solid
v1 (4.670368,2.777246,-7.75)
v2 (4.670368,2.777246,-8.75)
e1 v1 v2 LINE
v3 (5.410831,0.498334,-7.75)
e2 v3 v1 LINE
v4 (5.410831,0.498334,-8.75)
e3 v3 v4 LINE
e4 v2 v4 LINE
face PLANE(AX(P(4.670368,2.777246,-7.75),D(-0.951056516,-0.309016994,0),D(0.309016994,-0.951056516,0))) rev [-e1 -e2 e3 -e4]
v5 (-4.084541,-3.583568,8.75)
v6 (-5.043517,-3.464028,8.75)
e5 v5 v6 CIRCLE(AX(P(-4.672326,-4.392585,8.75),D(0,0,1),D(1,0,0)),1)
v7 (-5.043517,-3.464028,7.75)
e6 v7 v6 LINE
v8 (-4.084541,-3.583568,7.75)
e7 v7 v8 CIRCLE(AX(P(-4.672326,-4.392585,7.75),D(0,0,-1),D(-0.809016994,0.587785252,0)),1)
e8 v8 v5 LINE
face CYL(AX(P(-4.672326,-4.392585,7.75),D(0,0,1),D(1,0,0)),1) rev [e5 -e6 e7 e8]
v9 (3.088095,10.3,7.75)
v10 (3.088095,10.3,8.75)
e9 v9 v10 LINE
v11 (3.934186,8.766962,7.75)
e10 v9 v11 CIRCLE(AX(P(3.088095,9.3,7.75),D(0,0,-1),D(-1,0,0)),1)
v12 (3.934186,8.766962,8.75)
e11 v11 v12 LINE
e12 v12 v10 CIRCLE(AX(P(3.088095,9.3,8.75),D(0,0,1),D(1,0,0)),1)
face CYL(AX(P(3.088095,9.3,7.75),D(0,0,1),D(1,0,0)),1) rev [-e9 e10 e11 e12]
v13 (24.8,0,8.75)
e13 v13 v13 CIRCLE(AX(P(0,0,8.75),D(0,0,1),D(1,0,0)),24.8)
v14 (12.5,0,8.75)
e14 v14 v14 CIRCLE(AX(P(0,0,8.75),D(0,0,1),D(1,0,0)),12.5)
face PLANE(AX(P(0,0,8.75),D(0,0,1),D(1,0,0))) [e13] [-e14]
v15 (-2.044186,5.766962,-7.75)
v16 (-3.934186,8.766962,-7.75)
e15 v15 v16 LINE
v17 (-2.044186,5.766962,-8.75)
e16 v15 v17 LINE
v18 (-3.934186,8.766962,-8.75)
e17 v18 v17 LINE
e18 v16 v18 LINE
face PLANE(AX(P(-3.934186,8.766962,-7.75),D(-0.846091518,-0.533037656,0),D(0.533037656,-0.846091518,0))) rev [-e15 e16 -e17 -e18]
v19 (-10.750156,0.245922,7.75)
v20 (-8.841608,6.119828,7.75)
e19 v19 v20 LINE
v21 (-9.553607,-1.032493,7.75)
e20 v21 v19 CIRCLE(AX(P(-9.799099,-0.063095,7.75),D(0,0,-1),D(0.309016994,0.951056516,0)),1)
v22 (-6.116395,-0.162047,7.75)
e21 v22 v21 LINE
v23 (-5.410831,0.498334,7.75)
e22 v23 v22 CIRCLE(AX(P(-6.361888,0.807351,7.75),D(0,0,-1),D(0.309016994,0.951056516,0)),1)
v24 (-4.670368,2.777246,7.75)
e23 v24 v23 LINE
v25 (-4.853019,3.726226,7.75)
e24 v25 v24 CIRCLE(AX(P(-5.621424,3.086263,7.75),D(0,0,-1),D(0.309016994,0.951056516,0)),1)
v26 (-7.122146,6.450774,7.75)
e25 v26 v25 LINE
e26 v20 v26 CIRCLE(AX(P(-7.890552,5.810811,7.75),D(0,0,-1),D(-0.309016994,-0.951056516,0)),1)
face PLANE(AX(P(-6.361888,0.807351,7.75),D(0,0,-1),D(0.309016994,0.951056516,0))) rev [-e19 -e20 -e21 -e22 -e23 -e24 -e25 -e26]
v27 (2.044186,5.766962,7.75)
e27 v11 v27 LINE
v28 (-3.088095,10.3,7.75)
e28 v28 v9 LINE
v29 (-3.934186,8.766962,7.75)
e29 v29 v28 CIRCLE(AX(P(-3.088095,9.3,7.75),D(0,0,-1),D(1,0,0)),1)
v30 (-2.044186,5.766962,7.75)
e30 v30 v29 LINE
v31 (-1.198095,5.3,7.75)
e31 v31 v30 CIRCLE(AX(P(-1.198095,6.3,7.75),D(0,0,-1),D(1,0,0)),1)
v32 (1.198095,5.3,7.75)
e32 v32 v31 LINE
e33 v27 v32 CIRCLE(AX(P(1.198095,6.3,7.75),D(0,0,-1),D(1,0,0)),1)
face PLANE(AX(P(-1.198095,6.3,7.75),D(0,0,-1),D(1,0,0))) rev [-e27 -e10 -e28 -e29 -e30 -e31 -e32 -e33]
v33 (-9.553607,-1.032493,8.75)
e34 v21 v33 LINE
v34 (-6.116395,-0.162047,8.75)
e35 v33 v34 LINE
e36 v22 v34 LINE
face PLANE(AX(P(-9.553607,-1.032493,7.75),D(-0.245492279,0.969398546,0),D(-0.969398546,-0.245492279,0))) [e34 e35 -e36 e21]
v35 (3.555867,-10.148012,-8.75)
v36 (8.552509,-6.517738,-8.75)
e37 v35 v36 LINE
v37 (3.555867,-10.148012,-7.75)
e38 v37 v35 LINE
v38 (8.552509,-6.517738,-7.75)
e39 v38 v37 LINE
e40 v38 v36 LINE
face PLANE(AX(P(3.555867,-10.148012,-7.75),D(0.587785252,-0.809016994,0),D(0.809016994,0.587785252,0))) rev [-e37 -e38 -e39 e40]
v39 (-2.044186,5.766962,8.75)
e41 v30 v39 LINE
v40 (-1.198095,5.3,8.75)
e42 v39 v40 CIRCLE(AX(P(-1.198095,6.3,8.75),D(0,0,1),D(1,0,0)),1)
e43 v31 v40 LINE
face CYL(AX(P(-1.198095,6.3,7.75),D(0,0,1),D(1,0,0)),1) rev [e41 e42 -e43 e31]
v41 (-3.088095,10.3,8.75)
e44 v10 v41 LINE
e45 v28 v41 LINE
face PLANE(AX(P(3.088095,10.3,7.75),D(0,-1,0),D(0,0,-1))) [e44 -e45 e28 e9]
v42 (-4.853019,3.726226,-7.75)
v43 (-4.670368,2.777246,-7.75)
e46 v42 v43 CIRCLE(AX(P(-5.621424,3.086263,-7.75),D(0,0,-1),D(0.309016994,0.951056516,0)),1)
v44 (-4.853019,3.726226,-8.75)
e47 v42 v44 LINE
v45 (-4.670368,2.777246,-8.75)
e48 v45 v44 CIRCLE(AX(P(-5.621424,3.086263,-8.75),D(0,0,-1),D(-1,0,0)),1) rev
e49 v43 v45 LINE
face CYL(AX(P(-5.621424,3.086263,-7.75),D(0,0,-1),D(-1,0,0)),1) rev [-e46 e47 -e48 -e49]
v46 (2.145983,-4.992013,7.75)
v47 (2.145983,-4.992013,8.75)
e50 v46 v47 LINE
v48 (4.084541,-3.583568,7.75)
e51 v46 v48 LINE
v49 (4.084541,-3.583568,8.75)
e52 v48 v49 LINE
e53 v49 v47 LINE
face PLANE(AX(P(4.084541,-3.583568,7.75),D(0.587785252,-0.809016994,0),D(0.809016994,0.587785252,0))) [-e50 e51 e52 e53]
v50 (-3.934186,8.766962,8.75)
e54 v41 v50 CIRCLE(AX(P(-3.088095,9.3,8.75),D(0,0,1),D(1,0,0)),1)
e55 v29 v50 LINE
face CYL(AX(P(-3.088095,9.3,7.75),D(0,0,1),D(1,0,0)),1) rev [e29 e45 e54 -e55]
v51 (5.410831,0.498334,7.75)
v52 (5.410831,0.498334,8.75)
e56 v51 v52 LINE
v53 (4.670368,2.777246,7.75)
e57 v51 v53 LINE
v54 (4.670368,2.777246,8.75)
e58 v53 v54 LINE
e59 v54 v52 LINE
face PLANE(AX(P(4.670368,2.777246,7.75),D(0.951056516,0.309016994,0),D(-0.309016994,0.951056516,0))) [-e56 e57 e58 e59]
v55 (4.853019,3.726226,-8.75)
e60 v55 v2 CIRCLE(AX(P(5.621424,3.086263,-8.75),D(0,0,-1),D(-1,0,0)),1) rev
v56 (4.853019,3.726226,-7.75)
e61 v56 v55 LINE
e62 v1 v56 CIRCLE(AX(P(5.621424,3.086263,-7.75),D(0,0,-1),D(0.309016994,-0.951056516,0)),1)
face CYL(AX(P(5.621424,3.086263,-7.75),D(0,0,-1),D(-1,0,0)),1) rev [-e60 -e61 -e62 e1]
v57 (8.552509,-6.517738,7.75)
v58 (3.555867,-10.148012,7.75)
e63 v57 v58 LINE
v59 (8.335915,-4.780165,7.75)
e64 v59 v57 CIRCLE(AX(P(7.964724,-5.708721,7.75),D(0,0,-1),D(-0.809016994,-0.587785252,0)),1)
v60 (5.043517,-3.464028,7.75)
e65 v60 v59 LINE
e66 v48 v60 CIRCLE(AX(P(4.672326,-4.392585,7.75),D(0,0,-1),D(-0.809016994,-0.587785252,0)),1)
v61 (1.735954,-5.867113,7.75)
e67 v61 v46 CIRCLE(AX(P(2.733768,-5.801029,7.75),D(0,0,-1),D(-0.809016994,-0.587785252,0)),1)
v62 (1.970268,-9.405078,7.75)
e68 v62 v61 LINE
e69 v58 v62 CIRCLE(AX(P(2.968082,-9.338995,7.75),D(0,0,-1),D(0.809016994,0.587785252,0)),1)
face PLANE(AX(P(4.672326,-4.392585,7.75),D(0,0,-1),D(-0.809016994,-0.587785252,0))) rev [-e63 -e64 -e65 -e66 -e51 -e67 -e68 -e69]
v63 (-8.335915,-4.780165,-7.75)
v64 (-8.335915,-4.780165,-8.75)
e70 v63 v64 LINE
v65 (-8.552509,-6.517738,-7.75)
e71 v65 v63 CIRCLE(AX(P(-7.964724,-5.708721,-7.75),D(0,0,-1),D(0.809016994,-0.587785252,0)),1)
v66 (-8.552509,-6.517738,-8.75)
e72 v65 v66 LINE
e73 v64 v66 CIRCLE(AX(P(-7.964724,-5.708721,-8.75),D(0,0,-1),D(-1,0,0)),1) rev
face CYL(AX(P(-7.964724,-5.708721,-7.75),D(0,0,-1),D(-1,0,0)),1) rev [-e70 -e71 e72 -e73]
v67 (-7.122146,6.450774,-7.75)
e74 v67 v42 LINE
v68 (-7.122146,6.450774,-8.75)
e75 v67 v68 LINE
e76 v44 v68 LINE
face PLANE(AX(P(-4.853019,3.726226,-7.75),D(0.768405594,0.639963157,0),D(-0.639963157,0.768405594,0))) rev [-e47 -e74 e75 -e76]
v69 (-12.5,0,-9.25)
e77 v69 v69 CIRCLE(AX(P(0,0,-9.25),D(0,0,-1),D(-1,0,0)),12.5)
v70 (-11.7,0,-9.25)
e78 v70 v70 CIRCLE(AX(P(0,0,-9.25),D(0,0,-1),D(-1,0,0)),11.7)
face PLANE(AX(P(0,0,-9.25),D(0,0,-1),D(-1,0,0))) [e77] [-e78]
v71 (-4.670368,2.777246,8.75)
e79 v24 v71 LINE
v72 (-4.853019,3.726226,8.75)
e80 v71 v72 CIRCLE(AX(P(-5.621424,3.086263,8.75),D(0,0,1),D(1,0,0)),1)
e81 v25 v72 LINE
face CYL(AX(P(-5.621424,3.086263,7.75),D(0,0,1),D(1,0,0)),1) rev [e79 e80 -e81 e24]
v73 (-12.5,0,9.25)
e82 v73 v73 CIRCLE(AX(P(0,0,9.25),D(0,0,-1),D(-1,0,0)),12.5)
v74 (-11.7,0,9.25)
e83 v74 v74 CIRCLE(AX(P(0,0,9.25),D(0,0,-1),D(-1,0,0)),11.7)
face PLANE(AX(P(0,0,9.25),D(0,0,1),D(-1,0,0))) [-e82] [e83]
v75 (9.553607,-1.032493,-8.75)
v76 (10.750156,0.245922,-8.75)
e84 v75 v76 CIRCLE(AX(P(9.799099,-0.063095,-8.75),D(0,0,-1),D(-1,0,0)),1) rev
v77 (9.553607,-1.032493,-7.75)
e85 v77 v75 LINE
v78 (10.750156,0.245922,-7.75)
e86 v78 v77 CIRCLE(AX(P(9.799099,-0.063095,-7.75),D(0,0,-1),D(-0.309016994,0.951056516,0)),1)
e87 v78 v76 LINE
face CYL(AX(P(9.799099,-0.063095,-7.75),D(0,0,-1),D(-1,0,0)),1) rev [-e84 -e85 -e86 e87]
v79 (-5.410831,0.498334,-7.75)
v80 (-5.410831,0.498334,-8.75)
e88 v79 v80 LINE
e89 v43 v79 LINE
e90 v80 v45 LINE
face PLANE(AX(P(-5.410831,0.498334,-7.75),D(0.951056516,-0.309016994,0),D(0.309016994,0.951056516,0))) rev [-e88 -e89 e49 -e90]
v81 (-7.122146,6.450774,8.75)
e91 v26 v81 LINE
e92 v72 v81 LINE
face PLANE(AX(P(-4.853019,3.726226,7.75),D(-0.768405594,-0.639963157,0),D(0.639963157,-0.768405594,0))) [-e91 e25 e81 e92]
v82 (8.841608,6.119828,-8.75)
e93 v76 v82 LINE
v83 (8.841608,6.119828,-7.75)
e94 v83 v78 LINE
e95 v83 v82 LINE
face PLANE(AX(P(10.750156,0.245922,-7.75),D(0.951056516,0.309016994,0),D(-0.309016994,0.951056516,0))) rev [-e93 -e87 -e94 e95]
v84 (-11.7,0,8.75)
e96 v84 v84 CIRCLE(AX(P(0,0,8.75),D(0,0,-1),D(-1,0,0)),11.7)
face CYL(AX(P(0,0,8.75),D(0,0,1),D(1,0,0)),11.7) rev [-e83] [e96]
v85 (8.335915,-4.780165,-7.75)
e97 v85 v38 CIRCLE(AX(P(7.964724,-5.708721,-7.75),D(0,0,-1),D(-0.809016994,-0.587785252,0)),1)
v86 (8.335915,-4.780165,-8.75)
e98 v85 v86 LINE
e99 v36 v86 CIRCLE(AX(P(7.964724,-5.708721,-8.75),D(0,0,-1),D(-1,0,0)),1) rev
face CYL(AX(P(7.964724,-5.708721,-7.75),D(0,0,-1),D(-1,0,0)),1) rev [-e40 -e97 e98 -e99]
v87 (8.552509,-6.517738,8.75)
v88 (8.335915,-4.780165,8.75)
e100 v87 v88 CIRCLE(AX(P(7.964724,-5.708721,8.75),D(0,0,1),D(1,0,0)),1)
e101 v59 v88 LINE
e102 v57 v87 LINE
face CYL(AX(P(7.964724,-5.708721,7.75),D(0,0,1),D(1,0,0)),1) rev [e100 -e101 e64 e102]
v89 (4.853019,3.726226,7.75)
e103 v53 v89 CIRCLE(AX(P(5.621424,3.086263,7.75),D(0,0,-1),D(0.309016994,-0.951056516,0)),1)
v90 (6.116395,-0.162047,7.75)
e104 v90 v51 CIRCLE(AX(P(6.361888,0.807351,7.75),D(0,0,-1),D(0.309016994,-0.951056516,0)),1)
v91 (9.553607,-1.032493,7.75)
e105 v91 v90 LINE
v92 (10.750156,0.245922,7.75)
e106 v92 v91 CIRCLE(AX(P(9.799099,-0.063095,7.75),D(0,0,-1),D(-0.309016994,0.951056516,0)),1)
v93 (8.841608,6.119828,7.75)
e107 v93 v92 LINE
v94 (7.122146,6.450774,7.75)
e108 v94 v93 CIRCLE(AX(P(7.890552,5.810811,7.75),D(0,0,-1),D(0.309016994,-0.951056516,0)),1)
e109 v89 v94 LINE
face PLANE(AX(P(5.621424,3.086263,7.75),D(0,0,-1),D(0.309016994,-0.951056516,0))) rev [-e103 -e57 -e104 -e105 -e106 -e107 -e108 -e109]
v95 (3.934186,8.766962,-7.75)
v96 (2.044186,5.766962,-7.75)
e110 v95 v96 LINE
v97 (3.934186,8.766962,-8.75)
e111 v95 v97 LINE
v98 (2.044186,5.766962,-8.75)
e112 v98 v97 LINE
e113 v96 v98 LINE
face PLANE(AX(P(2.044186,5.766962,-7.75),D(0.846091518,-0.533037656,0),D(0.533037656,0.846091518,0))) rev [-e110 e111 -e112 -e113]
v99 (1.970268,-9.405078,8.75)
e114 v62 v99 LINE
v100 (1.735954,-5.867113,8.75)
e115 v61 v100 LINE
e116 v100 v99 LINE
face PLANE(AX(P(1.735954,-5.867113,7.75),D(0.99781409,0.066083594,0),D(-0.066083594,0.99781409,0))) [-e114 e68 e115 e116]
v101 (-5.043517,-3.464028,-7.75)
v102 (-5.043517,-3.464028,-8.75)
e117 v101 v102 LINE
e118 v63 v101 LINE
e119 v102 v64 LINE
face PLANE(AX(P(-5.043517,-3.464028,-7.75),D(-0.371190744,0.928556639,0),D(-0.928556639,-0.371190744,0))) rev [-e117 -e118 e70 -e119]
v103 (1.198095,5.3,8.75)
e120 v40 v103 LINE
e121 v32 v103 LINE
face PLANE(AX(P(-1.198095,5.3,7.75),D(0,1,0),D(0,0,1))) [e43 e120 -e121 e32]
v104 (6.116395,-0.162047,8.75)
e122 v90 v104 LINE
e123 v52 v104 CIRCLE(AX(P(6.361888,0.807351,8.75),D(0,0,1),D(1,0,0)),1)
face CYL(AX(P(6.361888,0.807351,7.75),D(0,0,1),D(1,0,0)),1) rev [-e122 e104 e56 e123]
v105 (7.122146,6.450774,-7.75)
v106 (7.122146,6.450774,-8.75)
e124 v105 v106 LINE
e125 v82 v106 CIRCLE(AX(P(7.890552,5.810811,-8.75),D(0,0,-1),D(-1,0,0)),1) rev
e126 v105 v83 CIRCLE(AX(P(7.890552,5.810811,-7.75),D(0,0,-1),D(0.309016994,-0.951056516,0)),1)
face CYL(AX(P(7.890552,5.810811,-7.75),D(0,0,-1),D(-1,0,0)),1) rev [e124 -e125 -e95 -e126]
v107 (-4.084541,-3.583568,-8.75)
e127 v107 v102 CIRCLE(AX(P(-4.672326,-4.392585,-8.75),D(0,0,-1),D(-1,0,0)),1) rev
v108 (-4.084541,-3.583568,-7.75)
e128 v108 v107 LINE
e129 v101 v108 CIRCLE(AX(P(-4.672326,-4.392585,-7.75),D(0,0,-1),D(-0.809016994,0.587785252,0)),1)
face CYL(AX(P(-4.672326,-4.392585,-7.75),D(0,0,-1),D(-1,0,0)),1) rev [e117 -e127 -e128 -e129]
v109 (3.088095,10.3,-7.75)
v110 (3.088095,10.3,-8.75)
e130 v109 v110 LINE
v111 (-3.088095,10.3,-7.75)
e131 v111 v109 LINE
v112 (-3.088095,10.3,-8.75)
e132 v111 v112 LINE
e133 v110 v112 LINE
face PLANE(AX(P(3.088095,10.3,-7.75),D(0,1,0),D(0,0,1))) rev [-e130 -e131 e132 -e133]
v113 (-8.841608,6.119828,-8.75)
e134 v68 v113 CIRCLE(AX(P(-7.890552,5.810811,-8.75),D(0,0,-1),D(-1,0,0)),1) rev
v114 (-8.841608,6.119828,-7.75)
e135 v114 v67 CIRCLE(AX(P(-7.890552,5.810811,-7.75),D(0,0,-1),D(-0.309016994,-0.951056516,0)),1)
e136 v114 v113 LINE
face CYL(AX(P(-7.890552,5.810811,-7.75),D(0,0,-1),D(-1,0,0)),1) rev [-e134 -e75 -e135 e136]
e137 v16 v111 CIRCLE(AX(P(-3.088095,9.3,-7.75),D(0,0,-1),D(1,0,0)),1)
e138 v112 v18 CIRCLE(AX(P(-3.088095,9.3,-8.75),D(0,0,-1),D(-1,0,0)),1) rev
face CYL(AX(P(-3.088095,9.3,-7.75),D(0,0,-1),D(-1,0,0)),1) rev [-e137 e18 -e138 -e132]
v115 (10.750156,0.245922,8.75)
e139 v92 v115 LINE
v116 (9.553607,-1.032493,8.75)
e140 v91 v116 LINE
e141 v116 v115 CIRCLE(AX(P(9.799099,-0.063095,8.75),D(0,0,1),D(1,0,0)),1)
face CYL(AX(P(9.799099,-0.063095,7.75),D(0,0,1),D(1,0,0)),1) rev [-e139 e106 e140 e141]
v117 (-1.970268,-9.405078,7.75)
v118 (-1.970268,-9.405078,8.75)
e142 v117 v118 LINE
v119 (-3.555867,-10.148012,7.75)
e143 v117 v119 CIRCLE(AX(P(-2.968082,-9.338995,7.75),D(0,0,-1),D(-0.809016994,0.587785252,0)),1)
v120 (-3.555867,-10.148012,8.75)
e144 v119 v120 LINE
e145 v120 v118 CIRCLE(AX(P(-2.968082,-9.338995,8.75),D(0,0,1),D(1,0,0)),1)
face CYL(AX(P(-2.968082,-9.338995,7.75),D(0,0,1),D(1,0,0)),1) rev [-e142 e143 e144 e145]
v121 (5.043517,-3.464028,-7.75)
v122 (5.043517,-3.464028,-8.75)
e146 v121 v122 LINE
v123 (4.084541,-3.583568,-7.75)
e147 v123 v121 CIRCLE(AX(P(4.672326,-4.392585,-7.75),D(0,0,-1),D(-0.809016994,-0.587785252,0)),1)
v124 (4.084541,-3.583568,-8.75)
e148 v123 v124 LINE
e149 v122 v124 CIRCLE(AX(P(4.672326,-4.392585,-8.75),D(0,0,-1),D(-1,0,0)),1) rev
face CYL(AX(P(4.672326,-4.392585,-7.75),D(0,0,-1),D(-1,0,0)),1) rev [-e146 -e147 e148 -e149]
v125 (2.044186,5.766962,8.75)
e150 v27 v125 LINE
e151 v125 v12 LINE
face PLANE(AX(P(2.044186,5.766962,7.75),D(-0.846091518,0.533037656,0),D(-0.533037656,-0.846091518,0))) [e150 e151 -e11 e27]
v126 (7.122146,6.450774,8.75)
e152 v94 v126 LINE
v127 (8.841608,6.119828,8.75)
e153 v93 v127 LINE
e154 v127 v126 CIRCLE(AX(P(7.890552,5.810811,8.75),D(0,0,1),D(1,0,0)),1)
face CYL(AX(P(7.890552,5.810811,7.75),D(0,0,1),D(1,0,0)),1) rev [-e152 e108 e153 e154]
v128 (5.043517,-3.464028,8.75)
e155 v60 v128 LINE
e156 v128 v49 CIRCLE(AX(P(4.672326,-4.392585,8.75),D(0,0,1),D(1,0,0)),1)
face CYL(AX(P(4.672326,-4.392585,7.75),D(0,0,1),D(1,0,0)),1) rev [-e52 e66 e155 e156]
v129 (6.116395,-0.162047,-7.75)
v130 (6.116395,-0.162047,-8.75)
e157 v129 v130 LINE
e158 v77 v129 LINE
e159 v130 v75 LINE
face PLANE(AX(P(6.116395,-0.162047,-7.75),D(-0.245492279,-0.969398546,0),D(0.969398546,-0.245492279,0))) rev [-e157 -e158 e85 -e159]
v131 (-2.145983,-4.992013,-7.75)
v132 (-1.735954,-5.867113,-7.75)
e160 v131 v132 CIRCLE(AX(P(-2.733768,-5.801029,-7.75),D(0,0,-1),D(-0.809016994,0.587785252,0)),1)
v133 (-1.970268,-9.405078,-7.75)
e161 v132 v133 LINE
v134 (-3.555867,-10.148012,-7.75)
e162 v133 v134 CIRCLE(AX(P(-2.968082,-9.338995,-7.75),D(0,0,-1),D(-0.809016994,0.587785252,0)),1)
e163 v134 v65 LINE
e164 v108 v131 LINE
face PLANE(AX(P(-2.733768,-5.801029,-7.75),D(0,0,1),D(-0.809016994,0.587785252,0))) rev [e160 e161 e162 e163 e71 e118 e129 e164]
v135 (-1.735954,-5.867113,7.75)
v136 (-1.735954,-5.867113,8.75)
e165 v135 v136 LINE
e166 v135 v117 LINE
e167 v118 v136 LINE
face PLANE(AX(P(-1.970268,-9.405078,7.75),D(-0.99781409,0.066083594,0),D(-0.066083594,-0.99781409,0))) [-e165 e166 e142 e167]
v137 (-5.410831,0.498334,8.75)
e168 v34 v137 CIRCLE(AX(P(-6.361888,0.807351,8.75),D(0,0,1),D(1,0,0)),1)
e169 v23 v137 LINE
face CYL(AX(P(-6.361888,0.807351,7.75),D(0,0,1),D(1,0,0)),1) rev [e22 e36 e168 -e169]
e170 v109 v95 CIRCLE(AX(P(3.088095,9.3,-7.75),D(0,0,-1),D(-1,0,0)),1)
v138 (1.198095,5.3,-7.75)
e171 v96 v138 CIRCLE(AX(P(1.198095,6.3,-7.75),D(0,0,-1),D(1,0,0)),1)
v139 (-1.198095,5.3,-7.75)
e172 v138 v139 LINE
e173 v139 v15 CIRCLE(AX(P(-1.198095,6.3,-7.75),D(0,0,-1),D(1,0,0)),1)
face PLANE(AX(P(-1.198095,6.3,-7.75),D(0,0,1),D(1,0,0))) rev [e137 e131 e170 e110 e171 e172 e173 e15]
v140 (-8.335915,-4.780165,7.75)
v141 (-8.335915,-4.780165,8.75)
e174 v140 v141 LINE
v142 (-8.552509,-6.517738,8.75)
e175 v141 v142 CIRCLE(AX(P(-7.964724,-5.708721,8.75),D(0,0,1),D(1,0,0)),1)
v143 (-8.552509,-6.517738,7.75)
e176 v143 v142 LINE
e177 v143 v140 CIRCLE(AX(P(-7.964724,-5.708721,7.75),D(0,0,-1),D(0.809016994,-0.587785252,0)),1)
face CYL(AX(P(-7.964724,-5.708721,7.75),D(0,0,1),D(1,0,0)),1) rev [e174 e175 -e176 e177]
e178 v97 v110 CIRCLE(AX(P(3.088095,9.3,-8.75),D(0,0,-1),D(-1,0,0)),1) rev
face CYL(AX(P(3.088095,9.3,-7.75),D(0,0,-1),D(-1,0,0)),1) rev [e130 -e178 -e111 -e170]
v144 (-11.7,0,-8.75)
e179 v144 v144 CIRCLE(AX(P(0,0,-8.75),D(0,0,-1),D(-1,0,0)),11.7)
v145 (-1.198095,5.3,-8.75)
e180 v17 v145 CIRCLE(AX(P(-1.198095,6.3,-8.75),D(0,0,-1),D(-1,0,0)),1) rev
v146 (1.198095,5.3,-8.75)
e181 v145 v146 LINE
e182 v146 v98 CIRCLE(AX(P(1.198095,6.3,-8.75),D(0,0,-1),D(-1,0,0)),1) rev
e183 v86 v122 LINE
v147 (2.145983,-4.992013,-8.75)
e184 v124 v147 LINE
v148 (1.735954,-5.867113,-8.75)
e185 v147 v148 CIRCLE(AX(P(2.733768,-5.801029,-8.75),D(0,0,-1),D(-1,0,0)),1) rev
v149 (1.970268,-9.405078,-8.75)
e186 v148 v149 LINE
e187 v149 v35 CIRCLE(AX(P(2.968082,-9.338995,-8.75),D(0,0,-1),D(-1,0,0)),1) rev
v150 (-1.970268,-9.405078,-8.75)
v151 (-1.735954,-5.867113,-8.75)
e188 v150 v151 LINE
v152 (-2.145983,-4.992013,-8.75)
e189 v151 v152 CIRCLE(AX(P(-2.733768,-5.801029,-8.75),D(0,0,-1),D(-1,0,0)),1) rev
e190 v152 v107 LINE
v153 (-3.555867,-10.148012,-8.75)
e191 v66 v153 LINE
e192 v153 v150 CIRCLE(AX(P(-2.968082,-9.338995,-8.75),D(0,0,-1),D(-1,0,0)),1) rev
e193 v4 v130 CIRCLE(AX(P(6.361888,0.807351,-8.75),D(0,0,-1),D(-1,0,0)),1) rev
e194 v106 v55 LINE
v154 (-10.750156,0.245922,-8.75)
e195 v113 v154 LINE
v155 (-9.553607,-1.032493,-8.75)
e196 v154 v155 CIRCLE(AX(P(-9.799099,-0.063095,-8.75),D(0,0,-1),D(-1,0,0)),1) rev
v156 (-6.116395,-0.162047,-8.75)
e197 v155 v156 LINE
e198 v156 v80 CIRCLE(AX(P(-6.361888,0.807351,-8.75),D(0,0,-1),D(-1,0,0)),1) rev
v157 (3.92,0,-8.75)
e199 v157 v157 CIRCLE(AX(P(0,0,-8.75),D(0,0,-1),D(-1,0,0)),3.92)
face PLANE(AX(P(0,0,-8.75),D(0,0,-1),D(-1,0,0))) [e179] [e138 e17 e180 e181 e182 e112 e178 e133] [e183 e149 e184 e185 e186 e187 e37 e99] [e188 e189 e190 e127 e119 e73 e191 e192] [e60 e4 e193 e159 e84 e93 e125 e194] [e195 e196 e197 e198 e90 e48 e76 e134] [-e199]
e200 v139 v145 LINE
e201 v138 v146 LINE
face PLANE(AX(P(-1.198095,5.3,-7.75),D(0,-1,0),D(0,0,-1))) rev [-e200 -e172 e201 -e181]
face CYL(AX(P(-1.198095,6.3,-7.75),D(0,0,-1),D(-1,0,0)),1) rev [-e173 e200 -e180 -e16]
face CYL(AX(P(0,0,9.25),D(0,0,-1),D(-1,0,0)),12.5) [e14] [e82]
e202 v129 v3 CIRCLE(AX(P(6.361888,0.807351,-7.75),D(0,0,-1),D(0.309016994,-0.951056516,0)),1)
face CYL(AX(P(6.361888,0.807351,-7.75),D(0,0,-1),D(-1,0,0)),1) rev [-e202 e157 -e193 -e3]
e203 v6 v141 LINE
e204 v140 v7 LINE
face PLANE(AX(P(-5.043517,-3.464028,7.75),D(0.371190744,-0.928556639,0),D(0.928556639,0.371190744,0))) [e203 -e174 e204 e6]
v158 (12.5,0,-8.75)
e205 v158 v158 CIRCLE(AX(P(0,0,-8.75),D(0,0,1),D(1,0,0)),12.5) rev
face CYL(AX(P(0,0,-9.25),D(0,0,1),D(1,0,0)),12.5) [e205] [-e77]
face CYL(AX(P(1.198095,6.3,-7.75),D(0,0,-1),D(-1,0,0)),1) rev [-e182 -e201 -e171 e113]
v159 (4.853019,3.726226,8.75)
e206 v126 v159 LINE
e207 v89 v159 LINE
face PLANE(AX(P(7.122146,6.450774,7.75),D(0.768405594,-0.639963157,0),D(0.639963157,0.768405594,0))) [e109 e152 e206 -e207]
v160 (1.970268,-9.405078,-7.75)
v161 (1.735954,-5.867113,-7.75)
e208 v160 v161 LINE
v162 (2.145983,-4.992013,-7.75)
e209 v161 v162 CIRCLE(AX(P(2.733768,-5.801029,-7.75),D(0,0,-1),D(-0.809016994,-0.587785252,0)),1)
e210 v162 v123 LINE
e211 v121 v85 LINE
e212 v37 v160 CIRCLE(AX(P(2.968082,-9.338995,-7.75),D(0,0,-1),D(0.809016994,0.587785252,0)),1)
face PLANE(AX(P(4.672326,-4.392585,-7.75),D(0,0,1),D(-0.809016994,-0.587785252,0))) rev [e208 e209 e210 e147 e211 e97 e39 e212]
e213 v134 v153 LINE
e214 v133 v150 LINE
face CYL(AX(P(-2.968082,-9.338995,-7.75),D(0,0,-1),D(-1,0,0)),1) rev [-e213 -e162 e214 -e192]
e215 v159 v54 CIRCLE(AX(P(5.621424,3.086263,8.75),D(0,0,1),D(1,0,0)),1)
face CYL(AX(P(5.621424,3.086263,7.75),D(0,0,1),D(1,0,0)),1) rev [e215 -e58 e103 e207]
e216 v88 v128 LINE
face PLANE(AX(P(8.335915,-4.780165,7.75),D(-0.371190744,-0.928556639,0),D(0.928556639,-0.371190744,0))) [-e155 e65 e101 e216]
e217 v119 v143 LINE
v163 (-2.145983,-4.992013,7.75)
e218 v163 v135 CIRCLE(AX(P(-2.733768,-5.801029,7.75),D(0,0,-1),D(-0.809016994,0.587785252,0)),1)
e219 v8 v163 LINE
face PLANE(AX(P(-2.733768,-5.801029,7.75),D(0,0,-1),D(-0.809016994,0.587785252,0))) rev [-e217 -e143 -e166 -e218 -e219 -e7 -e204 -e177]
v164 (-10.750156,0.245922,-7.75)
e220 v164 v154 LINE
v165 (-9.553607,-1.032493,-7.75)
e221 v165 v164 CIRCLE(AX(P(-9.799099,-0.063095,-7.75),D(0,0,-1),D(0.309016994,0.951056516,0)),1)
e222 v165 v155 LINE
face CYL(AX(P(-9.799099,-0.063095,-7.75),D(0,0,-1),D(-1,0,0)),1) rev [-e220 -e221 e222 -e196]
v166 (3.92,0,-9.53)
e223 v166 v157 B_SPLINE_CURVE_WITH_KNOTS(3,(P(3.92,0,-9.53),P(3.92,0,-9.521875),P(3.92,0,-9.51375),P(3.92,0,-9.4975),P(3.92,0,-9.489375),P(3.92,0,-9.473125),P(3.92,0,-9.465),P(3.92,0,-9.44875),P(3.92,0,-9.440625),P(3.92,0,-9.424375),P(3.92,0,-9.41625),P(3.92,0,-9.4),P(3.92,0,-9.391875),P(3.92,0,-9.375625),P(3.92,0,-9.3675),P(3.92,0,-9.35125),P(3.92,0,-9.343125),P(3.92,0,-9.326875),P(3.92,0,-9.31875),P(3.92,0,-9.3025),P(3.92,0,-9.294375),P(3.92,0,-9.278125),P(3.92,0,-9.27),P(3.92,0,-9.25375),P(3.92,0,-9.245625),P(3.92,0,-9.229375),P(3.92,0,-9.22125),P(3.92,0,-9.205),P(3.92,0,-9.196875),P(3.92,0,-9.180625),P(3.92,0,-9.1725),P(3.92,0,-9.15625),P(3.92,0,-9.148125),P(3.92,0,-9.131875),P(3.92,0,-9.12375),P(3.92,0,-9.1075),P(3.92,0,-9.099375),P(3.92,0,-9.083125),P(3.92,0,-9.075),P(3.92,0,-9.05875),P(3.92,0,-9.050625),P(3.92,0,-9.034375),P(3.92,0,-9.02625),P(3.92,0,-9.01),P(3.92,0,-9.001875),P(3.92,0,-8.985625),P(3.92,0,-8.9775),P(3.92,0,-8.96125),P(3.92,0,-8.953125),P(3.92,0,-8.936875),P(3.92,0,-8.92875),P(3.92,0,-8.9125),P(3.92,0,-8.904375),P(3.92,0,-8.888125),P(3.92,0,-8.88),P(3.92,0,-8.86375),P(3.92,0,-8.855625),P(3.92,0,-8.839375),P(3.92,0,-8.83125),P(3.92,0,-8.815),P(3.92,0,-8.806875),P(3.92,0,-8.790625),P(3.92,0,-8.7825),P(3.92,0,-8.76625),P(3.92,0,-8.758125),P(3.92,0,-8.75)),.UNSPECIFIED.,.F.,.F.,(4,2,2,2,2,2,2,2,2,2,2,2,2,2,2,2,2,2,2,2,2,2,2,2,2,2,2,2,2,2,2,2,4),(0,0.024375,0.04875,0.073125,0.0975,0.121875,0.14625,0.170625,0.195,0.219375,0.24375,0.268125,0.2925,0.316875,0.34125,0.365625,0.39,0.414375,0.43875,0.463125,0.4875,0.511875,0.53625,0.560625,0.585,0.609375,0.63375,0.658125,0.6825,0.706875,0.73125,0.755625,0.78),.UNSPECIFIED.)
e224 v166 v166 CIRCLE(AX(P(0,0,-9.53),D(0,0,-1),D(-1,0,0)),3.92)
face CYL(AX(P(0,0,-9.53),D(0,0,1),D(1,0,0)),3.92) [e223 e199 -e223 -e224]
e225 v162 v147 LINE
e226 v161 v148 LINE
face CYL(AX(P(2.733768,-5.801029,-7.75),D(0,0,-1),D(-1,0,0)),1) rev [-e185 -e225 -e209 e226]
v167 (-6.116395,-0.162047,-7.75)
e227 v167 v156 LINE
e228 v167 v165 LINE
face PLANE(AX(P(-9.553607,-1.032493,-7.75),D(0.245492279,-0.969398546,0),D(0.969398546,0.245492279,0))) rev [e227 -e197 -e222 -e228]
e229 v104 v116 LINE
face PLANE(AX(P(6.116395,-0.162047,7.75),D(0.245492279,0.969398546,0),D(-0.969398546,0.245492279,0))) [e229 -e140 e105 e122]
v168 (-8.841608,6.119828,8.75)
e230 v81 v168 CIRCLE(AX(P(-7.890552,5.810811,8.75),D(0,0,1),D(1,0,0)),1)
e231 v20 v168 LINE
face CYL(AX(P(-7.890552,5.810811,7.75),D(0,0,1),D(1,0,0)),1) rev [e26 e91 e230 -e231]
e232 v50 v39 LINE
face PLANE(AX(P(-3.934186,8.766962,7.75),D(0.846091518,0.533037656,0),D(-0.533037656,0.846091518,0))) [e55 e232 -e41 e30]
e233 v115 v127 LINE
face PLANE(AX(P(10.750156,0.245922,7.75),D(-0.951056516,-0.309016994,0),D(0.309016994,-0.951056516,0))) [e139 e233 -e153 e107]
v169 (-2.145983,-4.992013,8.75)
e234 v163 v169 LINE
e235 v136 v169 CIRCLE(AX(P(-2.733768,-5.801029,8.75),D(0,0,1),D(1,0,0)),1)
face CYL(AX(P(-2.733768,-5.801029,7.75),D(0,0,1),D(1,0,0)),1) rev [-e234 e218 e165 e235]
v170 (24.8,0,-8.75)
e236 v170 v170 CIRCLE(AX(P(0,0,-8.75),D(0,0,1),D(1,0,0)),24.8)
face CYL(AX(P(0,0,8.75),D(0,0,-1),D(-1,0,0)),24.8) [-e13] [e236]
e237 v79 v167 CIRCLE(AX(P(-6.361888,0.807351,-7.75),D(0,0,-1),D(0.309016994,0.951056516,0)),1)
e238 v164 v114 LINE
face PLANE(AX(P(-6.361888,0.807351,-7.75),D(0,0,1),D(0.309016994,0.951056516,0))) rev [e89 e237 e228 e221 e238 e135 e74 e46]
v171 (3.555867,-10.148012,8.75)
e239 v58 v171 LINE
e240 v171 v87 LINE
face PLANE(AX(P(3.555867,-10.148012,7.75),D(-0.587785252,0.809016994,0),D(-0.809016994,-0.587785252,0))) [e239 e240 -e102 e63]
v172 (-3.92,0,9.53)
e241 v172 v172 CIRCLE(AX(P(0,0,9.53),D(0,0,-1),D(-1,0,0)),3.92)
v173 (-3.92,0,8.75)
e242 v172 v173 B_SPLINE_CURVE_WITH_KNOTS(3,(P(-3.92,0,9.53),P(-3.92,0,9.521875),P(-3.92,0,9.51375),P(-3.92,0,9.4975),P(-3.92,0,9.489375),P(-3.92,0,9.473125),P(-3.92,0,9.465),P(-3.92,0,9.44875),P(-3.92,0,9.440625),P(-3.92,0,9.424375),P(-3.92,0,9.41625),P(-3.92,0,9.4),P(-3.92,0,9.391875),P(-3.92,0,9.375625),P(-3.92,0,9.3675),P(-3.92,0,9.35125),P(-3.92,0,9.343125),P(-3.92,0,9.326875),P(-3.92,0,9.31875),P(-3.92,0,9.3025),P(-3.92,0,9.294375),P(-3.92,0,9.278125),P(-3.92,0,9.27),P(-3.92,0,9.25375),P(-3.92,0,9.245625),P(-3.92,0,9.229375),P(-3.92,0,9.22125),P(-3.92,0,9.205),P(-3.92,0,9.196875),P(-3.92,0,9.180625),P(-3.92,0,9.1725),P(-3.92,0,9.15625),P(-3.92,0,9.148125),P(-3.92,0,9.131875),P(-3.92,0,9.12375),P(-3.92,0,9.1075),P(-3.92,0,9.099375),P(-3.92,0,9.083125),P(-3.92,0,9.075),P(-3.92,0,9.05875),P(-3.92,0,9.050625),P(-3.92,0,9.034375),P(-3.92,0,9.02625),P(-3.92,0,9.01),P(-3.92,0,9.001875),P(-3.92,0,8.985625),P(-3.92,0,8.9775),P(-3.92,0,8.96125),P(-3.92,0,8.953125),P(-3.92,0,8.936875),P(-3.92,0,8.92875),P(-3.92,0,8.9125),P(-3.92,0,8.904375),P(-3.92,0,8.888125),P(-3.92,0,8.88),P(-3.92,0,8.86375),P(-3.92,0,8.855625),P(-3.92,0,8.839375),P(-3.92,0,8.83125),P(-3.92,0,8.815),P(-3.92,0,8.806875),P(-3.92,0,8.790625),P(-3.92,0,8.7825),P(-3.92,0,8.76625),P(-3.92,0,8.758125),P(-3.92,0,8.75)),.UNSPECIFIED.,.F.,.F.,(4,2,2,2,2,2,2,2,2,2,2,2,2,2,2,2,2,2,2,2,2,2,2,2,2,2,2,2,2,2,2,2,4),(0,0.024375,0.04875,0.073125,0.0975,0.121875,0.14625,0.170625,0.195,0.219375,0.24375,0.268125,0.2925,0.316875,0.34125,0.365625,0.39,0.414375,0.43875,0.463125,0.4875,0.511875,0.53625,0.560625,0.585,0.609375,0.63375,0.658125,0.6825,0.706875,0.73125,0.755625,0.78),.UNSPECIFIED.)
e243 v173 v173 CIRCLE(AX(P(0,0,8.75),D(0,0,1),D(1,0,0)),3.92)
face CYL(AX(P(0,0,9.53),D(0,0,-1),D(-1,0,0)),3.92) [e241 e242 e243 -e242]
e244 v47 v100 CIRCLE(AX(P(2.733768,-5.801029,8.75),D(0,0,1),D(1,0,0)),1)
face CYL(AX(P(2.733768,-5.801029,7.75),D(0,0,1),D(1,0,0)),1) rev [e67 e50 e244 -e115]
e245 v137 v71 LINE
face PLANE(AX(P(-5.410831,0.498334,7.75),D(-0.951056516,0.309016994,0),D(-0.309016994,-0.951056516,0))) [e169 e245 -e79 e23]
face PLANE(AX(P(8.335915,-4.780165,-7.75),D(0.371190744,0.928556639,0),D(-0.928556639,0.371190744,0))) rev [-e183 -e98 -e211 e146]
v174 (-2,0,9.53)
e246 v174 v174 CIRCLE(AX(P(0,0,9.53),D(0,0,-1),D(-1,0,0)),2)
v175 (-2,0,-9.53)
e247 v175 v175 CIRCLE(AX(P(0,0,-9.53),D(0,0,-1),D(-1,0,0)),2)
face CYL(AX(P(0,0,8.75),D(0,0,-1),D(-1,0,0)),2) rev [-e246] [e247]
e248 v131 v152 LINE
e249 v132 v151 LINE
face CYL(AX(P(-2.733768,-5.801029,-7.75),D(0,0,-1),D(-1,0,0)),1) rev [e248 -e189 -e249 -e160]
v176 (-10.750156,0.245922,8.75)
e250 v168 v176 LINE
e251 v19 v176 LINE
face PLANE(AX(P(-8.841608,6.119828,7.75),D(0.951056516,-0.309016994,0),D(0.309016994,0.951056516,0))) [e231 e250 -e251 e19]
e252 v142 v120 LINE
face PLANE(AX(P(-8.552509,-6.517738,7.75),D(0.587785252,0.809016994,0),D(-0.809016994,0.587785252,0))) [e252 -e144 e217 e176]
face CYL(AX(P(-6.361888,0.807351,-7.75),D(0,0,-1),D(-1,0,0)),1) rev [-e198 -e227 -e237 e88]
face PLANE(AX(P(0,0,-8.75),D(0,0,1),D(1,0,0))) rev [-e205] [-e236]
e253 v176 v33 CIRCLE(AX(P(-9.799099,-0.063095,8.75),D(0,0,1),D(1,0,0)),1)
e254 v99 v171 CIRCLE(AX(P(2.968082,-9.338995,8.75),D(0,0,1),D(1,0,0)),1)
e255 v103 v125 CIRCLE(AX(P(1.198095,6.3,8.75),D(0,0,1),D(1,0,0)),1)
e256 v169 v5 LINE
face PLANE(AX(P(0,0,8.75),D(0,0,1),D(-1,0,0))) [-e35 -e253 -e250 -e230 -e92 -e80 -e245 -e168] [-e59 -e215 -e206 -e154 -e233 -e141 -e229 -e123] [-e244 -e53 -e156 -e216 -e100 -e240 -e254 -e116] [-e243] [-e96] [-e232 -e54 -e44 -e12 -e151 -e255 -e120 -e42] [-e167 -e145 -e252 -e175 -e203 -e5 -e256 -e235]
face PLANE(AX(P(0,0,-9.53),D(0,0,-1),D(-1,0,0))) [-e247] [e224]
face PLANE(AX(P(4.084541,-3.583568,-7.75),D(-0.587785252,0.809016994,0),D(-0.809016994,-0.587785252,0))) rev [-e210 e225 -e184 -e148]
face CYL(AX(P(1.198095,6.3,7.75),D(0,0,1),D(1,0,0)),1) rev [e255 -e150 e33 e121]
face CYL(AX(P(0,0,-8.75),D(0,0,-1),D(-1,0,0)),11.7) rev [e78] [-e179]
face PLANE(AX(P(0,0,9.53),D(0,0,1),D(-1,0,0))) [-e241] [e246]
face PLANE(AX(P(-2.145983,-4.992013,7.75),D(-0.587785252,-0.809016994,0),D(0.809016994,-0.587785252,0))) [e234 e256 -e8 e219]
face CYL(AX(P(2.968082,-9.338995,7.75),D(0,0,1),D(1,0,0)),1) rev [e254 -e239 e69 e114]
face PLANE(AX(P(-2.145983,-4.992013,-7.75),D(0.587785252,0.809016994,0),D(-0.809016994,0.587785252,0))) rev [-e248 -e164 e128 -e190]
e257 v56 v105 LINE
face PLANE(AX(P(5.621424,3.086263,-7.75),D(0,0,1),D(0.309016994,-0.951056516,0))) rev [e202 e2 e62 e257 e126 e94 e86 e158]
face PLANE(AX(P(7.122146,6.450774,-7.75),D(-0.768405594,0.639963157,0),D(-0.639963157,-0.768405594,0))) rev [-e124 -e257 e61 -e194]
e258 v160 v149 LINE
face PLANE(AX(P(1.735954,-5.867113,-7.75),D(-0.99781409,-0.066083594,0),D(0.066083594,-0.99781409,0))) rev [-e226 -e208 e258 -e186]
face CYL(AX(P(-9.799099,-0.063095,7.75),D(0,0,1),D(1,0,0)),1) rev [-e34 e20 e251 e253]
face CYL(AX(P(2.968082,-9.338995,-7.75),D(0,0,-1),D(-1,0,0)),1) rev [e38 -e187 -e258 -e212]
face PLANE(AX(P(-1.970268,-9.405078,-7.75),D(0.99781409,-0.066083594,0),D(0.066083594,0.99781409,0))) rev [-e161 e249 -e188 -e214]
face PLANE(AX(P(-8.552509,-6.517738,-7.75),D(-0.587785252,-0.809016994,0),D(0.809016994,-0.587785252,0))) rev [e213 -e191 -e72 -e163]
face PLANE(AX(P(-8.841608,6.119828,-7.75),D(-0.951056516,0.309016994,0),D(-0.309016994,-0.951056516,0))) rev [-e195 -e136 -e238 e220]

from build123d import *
from build123d.topology import SkipClean

# Parameters (mm, degrees)
SKETCH1_R             = 24.8
SKETCH1_R_2           = 2
BOSS_EXTRUDE1_DEPTH   = 8.75
BOSS_EXTRUDE3_START   = 0.5
SKETCH3_R             = 12.5
SKETCH3_R_2           = 2
BOSS_EXTRUDE3_DEPTH   = 0.5
CUT_EXTRUDE1_DEPTH    = 1.5
CIRPATTERN1_COUNT     = 5
SKETCH5_R             = 11.7
CUT_EXTRUDE2_DEPTH    = 0.5
BOSS_EXTRUDE4_START   = 0.78
SKETCH6_R             = 3.92
SKETCH6_R_2           = 2
BOSS_EXTRUDE4_DEPTH   = 0.78
MIRROR1_START         = 7.75
MIRROR1_DEPTH         = 1
MIRROR1_START_2       = 8.75
MIRROR1_2_OUTLINE_R   = 12.5
MIRROR1_2_OUTLINE_R_2 = 11.7
MIRROR1_2_OUTLINE_R_3 = 3.92
MIRROR1_2_OUTLINE_R_4 = 2
MIRROR1_2_DEPTH       = 0.5
MIRROR1_START_3       = 9.25
MIRROR1_3_OUTLINE_R   = 3.92
MIRROR1_3_OUTLINE_R_2 = 2
MIRROR1_3_DEPTH       = 0.28


# Read off the part's stored shape, not the designer's step: Mirror1
with BuildPart() as part:
    # Sketch1 → Boss-Extrude1 (new, symmetric)
    with BuildSketch(Plane.XY):
        Circle(SKETCH1_R)
        Circle(SKETCH1_R_2, mode=Mode.SUBTRACT)
    extrude(amount=BOSS_EXTRUDE1_DEPTH, both=True)

    # Sketch3 → Boss-Extrude3 (add)
    with SkipClean():  # the faces are left unmerged after this step: merging them gives an invalid solid
        with BuildSketch(Plane(origin=(0, 0, -8.75), x_dir=(-1, 0, 0), z_dir=(0, 0, -1)).offset(BOSS_EXTRUDE3_START)):
            with Locations(Location((0, 0, 0), (0, 0, 180))):
                Circle(SKETCH3_R)
            Circle(SKETCH3_R_2, mode=Mode.SUBTRACT)
        extrude(amount=-BOSS_EXTRUDE3_DEPTH)

    # Sketch4 → Cut-Extrude1 (cut)
    with SkipClean():  # the faces are left unmerged after this step: merging them gives an invalid solid
        with BuildSketch(Plane(origin=(0, 0, -9.25), x_dir=(-1, 0, 0), z_dir=(0, 0, -1))):
            with BuildLine():
                Line((-3.088094758, 10.3), (3.088094758, 10.3))
                ThreePointArc((3.088094758, 10.3), (3.963605368, 9.783198895), (3.934186276, 8.766962344))
                Line((3.934186276, 8.766962344), (2.044186276, 5.766962344))
                ThreePointArc((2.044186276, 5.766962344), (1.681293653, 5.42448939), (1.198094758, 5.3))
                Line((1.198094758, 5.3), (-1.198094758, 5.3))
                ThreePointArc((-1.198094758, 5.3), (-1.681293653, 5.42448939), (-2.044186276, 5.766962344))
                Line((-2.044186276, 5.766962344), (-3.934186276, 8.766962344))
                ThreePointArc((-3.934186276, 8.766962344), (-3.963605368, 9.783198895), (-3.088094758, 10.3))
            make_face()
        cut_extrude1 = extrude(amount=-CUT_EXTRUDE1_DEPTH, mode=Mode.SUBTRACT)

    # CirPattern1: Cut-Extrude1 ×5 about axis
    with SkipClean():  # the faces are left unmerged after this step: merging them gives an invalid solid
        cirpattern1_axis = Axis((0, 0, 0), (0, 0, 1))
        for i in range(1, CIRPATTERN1_COUNT):
            add(cut_extrude1.rotate(cirpattern1_axis, i * 360 / CIRPATTERN1_COUNT), mode=Mode.SUBTRACT)

    # Sketch5 → Cut-Extrude2 (cut)
    with BuildSketch(Plane(origin=(0, 0, -9.25), x_dir=(-1, 0, 0), z_dir=(0, 0, -1))):
        Circle(SKETCH5_R)
    extrude(amount=-CUT_EXTRUDE2_DEPTH, mode=Mode.SUBTRACT)

    # Sketch6 → Boss-Extrude4 (add)
    with BuildSketch(Plane(origin=(0, 0, -8.75), x_dir=(-1, 0, 0), z_dir=(0, 0, -1)).offset(BOSS_EXTRUDE4_START)):
        with Locations(Location((0, 0, 0), (0, 0, 180))):
            Circle(SKETCH6_R)
        Circle(SKETCH6_R_2, mode=Mode.SUBTRACT)
    extrude(amount=-BOSS_EXTRUDE4_DEPTH)

    # Mirror1 outline → Mirror1 (cut)
    with BuildSketch(Plane.XY.offset(MIRROR1_START)):
        with BuildLine():
            Line((-1.970267616, -9.405078198), (-1.735953979, -5.867113088))
            ThreePointArc((-1.735953979, -5.867113088), (-1.828239727, -5.376743716), (-2.145982817, -4.9920125))
            Line((-2.145982817, -4.9920125), (-4.084540858, -3.58356764))
            ThreePointArc((-4.084540858, -3.58356764), (-4.548630003, -3.400264488), (-5.043516853, -3.464027996))
            Line((-5.043516853, -3.464027996), (-8.33591473, -4.780164852))
            ThreePointArc((-8.33591473, -4.780164852), (-8.957044133, -5.585025384), (-8.552509238, -6.517738485))
            Line((-8.552509238, -6.517738485), (-3.555866959, -10.148011599))
            ThreePointArc((-3.555866959, -10.148011599), (-2.543795928, -10.244522947), (-1.970267616, -9.405078198))
        make_face()
        with BuildLine():
            Line((8.33591473, -4.780164852), (5.043516853, -3.464027996))
            ThreePointArc((5.043516853, -3.464027996), (4.548630003, -3.400264488), (4.084540858, -3.58356764))
            Line((4.084540858, -3.58356764), (2.145982817, -4.9920125))
            ThreePointArc((2.145982817, -4.9920125), (1.828239727, -5.376743716), (1.735953979, -5.867113088))
            Line((1.735953979, -5.867113088), (1.970267616, -9.405078198))
            ThreePointArc((1.970267616, -9.405078198), (2.543795928, -10.244522947), (3.555866959, -10.148011599))
            Line((3.555866959, -10.148011599), (8.552509238, -6.517738485))
            ThreePointArc((8.552509238, -6.517738485), (8.957044133, -5.585025384), (8.33591473, -4.780164852))
        make_face()
        with BuildLine():
            Line((7.122146247, 6.450773848), (4.853018817, 3.726226049))
            ThreePointArc((4.853018817, 3.726226049), (4.639447671, 3.275264692), (4.670367895, 2.777245897))
            Line((4.670367895, 2.777245897), (5.410831178, 0.498334243))
            ThreePointArc((5.410831178, 0.498334243), (5.678544293, 0.077254123), (6.116395415, -0.162047309))
            Line((6.116395415, -0.162047309), (9.553607084, -1.032493141))
            ThreePointArc((9.553607084, -1.032493141), (10.529196477, -0.746437996), (10.750155878, 0.245922399))
            Line((10.750155878, 0.245922399), (8.841608357, 6.119827685))
            ThreePointArc((8.841608357, 6.119827685), (8.079553641, 6.792787431), (7.122146247, 6.450773848))
        make_face()
        with BuildLine():
            Line((-3.934186276, 8.766962344), (-2.044186276, 5.766962344))
            ThreePointArc((-2.044186276, 5.766962344), (-1.681293653, 5.42448939), (-1.198094758, 5.3))
            Line((-1.198094758, 5.3), (1.198094758, 5.3))
            ThreePointArc((1.198094758, 5.3), (1.681293653, 5.42448939), (2.044186276, 5.766962344))
            Line((2.044186276, 5.766962344), (3.934186276, 8.766962344))
            ThreePointArc((3.934186276, 8.766962344), (3.963605368, 9.783198895), (3.088094758, 10.3))
            Line((3.088094758, 10.3), (-3.088094758, 10.3))
            ThreePointArc((-3.088094758, 10.3), (-3.963605368, 9.783198895), (-3.934186276, 8.766962344))
        make_face()
        with BuildLine():
            Line((-9.553607084, -1.032493141), (-6.116395415, -0.162047309))
            ThreePointArc((-6.116395415, -0.162047309), (-5.678544293, 0.077254123), (-5.410831178, 0.498334243))
            Line((-5.410831178, 0.498334243), (-4.670367895, 2.777245897))
            ThreePointArc((-4.670367895, 2.777245897), (-4.639447671, 3.275264692), (-4.853018817, 3.726226049))
            Line((-4.853018817, 3.726226049), (-7.122146247, 6.450773848))
            ThreePointArc((-7.122146247, 6.450773848), (-8.079553641, 6.792787431), (-8.841608357, 6.119827685))
            Line((-8.841608357, 6.119827685), (-10.750155878, 0.245922399))
            ThreePointArc((-10.750155878, 0.245922399), (-10.529196477, -0.746437996), (-9.553607084, -1.032493141))
        make_face()
    extrude(amount=MIRROR1_DEPTH, mode=Mode.SUBTRACT)

    # Mirror1 2 outline → Mirror1 2 (add)
    # profile 1 of 2: a face of its own
    with BuildSketch(Plane.XY.offset(MIRROR1_START_2)):
        Circle(MIRROR1_2_OUTLINE_R)
        Circle(MIRROR1_2_OUTLINE_R_2, mode=Mode.SUBTRACT)
    # profile 2 of 2: a face of its own
    with BuildSketch(Plane.XY.offset(MIRROR1_START_2)):
        Circle(MIRROR1_2_OUTLINE_R_3)
        Circle(MIRROR1_2_OUTLINE_R_4, mode=Mode.SUBTRACT)
    extrude(amount=MIRROR1_2_DEPTH)

    # Mirror1 3 outline → Mirror1 3 (add)
    with BuildSketch(Plane.XY.offset(MIRROR1_START_3)):
        Circle(MIRROR1_3_OUTLINE_R)
        Circle(MIRROR1_3_OUTLINE_R_2, mode=Mode.SUBTRACT)
    extrude(amount=MIRROR1_3_DEPTH)


solid = part.part
